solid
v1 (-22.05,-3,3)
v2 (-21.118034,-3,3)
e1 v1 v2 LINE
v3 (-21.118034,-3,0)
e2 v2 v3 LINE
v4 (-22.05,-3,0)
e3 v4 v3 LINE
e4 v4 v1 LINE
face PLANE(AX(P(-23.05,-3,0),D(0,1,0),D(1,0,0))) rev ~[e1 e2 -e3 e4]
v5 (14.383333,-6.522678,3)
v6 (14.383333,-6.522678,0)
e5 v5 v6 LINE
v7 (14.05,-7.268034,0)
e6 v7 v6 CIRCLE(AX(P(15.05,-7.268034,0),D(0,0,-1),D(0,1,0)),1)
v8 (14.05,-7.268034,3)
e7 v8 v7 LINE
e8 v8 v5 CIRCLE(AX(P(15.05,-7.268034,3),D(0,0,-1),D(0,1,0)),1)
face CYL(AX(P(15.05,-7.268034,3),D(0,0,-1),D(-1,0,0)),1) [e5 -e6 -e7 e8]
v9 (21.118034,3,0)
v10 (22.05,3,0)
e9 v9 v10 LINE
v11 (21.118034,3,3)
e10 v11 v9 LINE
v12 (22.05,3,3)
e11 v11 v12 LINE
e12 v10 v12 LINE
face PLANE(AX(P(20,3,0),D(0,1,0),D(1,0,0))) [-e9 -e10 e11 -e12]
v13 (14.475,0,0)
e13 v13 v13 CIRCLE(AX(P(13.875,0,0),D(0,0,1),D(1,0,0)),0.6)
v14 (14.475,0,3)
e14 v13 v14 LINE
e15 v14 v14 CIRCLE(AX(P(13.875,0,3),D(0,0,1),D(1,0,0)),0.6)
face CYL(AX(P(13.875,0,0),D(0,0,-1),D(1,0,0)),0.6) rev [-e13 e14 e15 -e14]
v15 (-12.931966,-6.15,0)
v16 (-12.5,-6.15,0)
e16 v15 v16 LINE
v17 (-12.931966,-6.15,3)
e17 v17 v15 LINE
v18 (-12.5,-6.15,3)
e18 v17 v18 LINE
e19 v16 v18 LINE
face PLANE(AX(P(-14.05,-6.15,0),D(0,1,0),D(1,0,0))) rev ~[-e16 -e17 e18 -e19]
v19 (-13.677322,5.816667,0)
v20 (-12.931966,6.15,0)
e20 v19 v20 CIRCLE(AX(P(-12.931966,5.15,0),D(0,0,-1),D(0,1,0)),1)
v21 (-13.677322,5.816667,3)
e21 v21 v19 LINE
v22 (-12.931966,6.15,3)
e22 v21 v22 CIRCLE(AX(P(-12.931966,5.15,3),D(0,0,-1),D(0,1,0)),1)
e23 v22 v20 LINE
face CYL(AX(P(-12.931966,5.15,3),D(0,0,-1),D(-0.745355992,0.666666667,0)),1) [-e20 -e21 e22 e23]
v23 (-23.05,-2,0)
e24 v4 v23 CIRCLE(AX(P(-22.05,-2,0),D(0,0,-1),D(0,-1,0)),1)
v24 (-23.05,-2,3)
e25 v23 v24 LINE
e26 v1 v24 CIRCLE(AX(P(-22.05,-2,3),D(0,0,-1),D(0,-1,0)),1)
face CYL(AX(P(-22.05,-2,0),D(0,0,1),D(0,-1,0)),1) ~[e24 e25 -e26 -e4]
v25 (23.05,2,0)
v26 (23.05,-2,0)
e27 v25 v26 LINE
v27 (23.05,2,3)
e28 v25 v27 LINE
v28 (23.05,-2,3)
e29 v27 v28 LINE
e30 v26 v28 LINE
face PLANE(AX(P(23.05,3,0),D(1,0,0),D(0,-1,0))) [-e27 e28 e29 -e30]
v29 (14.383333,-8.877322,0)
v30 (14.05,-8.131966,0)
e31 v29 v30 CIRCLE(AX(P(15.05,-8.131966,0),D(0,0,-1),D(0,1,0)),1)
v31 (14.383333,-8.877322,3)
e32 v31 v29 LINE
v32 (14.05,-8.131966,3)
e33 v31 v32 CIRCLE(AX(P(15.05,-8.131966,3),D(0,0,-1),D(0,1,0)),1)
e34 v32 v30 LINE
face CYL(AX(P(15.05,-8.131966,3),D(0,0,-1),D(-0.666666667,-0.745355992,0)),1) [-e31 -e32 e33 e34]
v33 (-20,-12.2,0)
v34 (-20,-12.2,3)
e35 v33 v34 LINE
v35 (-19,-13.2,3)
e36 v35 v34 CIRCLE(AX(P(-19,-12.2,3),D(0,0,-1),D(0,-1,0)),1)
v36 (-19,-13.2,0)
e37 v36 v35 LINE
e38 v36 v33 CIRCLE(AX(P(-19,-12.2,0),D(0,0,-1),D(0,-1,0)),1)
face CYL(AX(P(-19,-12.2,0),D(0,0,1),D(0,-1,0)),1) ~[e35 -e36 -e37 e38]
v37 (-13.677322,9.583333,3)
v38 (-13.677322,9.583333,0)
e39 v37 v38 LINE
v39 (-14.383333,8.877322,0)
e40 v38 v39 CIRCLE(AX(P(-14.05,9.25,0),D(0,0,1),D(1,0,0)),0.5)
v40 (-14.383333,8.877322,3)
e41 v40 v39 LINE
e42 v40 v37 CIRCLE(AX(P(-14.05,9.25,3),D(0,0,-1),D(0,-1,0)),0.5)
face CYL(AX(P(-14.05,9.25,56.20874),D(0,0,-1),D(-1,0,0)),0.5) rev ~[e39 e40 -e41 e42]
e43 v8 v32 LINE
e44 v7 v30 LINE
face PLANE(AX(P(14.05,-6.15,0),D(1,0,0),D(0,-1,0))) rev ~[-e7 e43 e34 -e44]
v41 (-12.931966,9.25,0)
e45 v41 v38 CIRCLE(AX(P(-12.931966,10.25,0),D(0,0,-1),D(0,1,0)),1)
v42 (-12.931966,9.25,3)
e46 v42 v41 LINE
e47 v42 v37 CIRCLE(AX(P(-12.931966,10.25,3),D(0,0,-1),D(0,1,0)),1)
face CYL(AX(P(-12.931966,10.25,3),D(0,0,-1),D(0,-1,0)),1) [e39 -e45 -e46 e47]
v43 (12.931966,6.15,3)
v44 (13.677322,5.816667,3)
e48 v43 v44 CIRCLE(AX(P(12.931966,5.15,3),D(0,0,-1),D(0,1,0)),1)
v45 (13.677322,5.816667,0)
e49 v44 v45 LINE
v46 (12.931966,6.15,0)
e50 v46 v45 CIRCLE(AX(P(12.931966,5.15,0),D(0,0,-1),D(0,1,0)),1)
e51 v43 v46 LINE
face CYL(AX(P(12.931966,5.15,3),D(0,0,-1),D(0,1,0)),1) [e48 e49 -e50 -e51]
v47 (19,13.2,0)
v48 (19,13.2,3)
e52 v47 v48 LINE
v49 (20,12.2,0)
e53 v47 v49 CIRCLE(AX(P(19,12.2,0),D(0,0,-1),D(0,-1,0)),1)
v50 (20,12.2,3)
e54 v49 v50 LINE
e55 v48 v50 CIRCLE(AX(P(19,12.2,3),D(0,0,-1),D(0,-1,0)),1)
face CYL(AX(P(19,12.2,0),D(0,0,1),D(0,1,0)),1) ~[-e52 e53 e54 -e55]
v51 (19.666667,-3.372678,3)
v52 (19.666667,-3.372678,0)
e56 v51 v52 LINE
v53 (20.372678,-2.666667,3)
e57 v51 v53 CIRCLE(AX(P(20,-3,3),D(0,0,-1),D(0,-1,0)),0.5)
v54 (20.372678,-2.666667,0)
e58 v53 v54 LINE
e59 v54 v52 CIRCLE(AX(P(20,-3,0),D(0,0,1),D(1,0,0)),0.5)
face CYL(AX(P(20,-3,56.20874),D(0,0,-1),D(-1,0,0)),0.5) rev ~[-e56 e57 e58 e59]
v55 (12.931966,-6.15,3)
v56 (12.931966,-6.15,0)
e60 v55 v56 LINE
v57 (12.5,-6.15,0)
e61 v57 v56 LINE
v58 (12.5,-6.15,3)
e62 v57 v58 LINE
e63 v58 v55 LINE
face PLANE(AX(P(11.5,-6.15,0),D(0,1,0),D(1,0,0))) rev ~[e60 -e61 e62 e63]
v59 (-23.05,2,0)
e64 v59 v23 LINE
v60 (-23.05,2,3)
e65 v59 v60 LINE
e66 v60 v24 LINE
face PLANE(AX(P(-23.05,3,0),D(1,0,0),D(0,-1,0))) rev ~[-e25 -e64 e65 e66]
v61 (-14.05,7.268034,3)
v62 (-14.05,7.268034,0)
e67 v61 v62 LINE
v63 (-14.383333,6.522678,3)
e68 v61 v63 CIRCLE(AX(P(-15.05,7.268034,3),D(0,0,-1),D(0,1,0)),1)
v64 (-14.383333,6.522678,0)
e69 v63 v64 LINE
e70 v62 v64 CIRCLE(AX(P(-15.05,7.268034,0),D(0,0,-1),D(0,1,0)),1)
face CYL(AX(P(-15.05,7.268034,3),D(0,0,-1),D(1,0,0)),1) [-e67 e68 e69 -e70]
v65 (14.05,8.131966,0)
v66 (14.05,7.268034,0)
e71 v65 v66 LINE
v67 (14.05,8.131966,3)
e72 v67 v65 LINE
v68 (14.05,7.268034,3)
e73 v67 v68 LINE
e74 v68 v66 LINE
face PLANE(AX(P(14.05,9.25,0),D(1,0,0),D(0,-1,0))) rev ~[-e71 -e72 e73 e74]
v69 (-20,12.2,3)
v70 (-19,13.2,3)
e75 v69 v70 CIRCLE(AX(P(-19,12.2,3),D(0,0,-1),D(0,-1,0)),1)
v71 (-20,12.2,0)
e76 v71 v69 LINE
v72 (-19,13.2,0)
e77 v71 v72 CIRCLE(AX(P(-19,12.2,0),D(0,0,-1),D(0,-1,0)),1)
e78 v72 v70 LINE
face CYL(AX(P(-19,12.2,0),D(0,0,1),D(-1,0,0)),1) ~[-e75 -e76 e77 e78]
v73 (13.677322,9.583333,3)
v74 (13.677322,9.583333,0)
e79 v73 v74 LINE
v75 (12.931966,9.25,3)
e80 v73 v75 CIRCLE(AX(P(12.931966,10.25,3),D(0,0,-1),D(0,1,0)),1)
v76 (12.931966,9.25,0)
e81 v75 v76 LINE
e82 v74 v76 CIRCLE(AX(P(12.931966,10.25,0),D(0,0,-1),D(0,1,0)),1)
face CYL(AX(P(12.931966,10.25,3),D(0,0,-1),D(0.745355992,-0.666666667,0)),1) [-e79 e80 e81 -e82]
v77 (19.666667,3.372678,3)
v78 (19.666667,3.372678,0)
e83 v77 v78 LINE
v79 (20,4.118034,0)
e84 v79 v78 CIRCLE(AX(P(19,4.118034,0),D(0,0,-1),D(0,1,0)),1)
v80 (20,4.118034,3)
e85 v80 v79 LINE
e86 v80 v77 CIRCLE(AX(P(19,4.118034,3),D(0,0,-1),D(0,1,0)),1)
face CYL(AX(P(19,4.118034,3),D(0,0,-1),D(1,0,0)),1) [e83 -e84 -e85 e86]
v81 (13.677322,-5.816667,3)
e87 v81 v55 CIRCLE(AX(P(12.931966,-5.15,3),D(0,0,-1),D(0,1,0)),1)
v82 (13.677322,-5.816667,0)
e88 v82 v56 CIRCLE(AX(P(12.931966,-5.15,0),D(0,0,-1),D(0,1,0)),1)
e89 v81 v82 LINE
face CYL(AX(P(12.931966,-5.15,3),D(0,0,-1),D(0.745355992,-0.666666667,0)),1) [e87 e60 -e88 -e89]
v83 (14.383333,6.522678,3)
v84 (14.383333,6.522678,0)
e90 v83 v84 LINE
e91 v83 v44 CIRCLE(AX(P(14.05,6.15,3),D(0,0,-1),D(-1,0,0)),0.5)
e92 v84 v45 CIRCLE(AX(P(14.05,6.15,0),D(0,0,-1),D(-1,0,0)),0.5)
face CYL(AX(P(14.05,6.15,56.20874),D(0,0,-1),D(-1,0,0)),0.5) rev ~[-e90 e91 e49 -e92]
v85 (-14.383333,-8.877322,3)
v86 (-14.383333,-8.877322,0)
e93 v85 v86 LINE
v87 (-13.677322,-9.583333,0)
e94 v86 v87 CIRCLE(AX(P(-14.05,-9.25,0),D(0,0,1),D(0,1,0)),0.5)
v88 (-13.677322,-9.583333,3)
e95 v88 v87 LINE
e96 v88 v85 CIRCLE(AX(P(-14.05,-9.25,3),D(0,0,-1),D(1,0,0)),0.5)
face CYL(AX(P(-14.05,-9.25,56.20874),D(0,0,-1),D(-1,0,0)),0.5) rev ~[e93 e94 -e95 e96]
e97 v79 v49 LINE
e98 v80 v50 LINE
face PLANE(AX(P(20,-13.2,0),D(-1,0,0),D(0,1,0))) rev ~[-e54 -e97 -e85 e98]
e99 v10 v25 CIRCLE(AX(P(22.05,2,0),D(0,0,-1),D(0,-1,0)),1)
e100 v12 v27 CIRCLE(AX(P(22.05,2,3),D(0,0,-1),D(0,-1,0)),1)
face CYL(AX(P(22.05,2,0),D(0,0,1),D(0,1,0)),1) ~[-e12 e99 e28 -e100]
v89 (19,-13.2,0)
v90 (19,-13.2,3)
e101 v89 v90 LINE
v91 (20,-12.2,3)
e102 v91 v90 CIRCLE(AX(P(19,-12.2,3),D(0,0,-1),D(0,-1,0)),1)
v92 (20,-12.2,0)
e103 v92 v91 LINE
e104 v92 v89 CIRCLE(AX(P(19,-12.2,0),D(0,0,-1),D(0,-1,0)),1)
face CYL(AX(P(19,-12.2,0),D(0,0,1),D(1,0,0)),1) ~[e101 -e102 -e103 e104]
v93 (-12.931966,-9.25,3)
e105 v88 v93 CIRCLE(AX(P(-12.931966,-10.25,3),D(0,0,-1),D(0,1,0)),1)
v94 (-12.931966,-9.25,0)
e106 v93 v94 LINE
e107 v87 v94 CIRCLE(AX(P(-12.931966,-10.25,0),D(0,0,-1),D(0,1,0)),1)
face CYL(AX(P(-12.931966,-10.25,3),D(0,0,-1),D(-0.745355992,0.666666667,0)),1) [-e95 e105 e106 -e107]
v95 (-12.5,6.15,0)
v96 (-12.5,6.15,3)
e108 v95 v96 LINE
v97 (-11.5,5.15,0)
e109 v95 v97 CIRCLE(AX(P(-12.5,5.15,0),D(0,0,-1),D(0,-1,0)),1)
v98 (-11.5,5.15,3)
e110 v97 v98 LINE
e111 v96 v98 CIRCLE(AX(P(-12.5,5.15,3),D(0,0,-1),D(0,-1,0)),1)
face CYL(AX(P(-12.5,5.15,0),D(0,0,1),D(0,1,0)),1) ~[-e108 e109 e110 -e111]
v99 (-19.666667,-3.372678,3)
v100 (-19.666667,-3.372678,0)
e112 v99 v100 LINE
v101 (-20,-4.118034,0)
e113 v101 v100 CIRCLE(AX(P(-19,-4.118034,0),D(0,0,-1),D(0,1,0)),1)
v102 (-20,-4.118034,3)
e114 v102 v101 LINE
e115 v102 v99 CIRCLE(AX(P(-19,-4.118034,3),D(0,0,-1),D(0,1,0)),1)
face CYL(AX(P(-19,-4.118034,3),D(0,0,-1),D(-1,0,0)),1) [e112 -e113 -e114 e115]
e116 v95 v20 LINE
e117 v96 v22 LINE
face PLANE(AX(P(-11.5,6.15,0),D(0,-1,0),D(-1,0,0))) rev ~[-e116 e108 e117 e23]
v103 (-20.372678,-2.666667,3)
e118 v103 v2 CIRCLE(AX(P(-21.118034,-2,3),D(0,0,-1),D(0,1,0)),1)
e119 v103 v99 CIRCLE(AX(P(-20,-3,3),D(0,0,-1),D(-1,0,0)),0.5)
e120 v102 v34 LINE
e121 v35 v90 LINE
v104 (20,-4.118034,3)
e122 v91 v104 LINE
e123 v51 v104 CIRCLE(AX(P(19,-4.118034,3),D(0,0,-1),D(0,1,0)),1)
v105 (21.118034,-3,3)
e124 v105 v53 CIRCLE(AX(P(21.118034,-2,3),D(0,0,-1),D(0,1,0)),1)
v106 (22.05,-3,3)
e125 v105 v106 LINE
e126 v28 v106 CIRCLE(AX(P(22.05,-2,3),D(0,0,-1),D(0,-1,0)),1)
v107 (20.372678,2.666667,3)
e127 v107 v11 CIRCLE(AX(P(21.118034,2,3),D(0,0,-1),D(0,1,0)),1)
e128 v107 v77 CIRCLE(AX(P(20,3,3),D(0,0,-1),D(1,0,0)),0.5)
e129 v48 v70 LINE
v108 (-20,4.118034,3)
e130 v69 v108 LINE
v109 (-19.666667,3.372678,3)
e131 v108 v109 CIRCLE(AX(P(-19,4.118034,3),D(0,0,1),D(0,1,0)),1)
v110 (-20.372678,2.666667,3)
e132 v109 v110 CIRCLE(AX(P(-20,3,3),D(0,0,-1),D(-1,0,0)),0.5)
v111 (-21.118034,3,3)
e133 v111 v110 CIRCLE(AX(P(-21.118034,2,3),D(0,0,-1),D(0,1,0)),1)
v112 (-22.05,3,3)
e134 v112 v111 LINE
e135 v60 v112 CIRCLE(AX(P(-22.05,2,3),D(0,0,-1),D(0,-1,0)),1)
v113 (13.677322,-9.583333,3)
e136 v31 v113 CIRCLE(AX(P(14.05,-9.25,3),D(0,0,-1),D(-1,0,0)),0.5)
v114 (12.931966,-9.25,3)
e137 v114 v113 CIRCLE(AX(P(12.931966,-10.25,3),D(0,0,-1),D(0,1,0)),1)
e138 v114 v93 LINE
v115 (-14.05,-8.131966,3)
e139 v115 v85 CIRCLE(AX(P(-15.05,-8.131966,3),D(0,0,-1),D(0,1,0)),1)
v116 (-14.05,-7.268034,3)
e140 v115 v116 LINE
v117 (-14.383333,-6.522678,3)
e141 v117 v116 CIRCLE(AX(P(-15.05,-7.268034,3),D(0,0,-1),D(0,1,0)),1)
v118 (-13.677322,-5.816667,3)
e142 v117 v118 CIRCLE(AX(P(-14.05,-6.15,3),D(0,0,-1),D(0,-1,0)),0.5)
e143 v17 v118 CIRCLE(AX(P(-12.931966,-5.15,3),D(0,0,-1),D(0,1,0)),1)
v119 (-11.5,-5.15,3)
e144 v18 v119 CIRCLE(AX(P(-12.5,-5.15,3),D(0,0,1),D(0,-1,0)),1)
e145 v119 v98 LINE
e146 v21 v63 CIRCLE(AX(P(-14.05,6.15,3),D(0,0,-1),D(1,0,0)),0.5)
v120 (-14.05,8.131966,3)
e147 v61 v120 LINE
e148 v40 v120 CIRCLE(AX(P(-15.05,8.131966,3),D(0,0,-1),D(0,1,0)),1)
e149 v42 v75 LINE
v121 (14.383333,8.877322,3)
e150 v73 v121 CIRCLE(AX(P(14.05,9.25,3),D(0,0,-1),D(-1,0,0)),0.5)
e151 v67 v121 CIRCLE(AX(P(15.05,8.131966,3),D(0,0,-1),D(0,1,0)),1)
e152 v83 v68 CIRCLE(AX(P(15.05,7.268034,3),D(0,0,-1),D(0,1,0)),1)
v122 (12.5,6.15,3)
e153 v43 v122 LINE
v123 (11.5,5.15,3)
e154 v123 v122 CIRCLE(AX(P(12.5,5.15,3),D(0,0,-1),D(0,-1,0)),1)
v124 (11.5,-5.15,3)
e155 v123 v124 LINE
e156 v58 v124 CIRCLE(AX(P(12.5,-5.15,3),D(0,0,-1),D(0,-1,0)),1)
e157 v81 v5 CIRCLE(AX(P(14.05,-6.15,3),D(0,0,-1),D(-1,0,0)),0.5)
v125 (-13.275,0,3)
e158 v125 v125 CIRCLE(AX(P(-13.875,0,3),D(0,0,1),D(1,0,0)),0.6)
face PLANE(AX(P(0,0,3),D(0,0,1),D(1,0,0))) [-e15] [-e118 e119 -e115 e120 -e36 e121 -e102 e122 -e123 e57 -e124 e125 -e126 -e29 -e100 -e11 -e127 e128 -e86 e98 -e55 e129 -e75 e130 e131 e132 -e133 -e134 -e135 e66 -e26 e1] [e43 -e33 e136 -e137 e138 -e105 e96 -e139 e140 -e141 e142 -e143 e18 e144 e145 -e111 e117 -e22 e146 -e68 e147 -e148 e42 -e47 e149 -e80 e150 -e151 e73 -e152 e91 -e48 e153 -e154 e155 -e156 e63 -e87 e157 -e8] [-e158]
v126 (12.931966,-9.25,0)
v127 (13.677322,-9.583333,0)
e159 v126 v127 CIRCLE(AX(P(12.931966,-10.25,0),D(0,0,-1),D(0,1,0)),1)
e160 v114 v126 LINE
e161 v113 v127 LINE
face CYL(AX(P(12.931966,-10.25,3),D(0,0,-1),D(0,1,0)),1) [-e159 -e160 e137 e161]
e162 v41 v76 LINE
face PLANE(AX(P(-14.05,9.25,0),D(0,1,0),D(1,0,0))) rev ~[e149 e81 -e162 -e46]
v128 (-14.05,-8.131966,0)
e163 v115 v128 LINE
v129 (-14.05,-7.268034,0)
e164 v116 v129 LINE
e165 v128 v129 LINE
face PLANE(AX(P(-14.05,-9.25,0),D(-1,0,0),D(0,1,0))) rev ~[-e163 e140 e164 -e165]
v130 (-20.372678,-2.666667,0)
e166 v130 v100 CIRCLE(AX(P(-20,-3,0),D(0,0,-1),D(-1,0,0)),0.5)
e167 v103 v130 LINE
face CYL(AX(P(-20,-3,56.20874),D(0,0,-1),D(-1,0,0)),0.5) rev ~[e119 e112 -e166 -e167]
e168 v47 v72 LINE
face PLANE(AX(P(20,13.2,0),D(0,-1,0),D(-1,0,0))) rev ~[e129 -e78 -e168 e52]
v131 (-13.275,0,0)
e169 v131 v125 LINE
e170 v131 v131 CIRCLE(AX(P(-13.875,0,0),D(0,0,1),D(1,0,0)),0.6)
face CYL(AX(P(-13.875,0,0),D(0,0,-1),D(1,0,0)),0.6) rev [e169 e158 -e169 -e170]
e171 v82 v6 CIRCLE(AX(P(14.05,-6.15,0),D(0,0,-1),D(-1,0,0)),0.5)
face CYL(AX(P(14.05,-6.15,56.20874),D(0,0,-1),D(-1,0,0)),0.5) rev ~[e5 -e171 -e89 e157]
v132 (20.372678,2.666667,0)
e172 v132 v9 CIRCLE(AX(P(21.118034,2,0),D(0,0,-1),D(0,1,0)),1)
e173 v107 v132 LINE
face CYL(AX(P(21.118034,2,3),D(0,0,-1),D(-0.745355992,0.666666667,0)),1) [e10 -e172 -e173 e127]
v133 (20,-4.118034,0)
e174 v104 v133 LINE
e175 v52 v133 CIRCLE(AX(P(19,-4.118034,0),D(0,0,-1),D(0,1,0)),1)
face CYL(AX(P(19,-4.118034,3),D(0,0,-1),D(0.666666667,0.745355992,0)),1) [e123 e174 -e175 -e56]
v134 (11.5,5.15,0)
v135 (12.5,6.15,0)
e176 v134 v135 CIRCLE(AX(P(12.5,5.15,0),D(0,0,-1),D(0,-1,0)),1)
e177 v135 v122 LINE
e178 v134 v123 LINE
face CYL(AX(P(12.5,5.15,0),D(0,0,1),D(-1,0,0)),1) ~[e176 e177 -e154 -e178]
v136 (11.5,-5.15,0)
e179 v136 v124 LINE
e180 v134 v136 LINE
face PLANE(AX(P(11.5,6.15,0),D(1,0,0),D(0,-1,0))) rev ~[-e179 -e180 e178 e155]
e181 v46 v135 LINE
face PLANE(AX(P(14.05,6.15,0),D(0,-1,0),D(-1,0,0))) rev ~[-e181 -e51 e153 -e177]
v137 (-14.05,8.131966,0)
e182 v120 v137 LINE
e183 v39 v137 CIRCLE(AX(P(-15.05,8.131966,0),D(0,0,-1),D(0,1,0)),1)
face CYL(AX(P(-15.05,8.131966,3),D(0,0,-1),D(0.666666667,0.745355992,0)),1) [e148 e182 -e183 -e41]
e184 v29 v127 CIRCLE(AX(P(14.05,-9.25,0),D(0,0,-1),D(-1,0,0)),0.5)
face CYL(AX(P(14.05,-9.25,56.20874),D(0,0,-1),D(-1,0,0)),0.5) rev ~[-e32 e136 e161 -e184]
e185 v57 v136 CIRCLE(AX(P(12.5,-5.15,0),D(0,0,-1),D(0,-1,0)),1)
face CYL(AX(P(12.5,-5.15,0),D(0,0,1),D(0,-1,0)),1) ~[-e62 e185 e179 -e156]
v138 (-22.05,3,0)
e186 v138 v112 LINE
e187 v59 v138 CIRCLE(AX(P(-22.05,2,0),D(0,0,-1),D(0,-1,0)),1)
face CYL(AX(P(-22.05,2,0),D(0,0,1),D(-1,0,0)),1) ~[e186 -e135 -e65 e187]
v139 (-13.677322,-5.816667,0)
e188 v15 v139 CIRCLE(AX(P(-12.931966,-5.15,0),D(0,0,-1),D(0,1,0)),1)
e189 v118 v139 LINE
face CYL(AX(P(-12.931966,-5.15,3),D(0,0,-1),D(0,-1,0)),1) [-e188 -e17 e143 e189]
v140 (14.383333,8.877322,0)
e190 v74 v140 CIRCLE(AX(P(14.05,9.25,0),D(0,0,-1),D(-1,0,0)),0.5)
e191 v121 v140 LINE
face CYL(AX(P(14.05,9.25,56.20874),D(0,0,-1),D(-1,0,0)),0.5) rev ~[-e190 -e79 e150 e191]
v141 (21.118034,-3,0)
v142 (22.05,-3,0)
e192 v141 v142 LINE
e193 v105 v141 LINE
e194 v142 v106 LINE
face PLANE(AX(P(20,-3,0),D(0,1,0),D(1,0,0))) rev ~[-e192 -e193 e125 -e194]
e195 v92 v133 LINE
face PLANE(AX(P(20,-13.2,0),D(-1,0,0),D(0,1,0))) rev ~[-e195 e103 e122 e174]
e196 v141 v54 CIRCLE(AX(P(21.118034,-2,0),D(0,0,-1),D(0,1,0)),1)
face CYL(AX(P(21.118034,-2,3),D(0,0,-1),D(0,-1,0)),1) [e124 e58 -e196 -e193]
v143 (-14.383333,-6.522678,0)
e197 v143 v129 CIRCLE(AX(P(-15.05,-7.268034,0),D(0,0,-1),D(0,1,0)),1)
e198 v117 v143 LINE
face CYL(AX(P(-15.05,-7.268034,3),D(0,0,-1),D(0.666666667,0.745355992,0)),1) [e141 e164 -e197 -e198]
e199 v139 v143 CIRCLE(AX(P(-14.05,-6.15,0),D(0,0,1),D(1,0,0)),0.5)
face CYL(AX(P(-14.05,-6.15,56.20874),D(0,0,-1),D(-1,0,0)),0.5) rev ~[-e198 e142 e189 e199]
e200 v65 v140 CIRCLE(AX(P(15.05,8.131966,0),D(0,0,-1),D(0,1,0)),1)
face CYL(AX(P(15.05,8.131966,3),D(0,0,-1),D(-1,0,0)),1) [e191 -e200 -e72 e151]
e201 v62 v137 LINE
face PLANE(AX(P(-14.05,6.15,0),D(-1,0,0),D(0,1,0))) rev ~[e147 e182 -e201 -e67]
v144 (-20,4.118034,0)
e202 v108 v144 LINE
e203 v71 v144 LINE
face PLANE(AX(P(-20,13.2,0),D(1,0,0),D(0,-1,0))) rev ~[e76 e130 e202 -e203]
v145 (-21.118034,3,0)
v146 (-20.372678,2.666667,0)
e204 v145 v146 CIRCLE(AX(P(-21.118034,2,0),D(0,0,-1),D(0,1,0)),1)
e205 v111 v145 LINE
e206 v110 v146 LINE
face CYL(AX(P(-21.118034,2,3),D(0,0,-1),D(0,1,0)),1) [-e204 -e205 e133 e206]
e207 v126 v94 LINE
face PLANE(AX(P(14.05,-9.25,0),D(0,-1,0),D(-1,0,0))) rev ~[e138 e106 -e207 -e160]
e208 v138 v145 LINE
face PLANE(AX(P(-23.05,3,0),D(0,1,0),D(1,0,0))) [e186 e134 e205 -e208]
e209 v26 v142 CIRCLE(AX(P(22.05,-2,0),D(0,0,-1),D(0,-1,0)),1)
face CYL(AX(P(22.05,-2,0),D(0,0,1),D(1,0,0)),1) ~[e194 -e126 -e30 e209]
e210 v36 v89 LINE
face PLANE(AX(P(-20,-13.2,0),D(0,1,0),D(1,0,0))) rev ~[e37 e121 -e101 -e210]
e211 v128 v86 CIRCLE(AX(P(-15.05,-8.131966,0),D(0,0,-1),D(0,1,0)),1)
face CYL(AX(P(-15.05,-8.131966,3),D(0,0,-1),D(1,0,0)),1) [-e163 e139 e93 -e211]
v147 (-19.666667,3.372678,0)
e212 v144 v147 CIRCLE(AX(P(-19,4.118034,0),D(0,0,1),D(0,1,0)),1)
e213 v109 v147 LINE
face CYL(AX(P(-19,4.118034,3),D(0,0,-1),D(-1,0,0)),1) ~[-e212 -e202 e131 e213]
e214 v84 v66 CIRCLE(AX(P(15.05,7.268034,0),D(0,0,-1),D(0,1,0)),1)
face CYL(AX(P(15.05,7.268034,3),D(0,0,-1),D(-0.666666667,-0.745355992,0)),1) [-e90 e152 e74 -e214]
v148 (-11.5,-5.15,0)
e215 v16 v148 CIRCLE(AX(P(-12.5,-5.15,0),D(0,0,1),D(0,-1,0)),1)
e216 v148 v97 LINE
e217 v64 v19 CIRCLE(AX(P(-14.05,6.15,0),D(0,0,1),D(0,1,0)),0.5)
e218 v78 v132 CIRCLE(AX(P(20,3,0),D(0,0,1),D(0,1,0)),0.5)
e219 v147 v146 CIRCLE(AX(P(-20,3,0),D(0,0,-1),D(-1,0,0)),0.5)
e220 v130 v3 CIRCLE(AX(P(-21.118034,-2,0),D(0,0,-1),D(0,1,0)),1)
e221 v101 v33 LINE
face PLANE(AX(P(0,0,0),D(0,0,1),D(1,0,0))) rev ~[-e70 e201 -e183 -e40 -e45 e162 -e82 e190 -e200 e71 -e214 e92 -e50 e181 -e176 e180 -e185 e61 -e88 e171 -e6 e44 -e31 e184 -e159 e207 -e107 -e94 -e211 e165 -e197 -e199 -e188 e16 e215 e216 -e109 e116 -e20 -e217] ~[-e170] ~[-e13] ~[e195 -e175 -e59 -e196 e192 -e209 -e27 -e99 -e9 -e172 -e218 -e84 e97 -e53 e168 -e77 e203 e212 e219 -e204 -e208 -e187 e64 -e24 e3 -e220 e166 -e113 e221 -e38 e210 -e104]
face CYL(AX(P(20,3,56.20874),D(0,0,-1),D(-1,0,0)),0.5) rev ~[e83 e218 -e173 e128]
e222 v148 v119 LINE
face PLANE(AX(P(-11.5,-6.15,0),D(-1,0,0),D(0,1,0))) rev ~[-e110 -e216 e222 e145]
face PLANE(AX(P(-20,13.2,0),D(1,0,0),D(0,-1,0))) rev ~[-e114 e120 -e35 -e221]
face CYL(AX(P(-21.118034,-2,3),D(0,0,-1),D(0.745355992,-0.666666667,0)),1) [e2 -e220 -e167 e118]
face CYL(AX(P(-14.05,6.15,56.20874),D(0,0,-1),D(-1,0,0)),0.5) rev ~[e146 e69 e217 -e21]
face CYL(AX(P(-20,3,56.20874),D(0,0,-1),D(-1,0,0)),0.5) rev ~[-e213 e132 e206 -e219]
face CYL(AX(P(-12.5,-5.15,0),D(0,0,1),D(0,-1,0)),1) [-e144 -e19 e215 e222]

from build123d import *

# Parameters (mm, degrees)
F0_R     = 0.6
F1_DEPTH = 3
F2_W     = 3.05
F2_H     = 6
F3_DEPTH = 3
F5_D     = 1
F6_R     = 1


with BuildPart() as f1:
    # F0 (on Top) → F1 (new body)
    with BuildSketch(Plane.XY):
        Polygon((-20, 13.2), (-20, -13.2), (0, -13.2), (20, -13.2), (20, 13.2), align=None)
        with Locations((-13.875, 0)):
            Circle(F0_R, mode=Mode.SUBTRACT)
        Polygon((-14.05, 6.15), (-14.05, 9.25), (14.05, 9.25), (14.05, 6.15), (11.5, 6.15), (11.5, -6.15), (14.05, -6.15), (14.05, -9.25), (-14.05, -9.25), (-14.05, -6.15), (-11.5, -6.15), (-11.5, 6.15), align=None, mode=Mode.SUBTRACT)
        with Locations((13.875, 0)):
            Circle(F0_R, mode=Mode.SUBTRACT)
    extrude(amount=F1_DEPTH)

    # F2 (on face) → F3 (join, through all)
    with BuildSketch(Plane(origin=(0, 0, 0), x_dir=(1, 0, 0), z_dir=(0, 0, -1))):
        with Locations((-21.525, 0)):
            Rectangle(F2_W, F2_H)
        with Locations((21.525, 0)):
            Rectangle(F2_W, F2_H)
    extrude(amount=-F3_DEPTH)

    # F5 (through all)
    with Locations(Plane.XY.offset(3)):
        with Locations((-14.05, 9.25), (-14.05, 6.15), (-20, 3), (-20, -3), (-14.05, -6.15), (-14.05, -9.25), (14.05, -6.15), (14.05, -9.25), (20, -3), (20, 3), (14.05, 6.15), (14.05, 9.25)):
            Hole(F5_D / 2)

    # F6
    f6_edges = [f1.edges().sort_by_distance(p)[0] for p in [
        (-20, 13.2, 1.5),
        (-23.05, 3, 1.5),
        (-23.05, -3, 1.5),
        (-20, -13.2, 1.5),
        (-11.5, 6.15, 1.5),
        (11.5, -6.15, 1.5),
        (11.5, 6.15, 1.5),
        (23.05, 3, 1.5),
        (20, 13.2, 1.5),
        (23.05, -3, 1.5),
        (20, -13.2, 1.5),
        (-11.5, -6.15, 1.5),
        (-20, 3.5, 1.5),
        (20, 3.5, 1.5),
        (20.5, 3, 1.5),
        (20.5, -3, 1.5),
        (20, -3.5, 1.5),
        (-20, -3.5, 1.5),
        (-20.5, -3, 1.5),
        (-20.5, 3, 1.5),
        (-13.55, 6.15, 1.5),
        (-13.55, -6.15, 1.5),
        (-14.05, -6.65, 1.5),
        (-14.05, -8.75, 1.5),
        (-13.55, -9.25, 1.5),
        (13.55, -9.25, 1.5),
        (14.05, -8.75, 1.5),
        (14.05, -6.65, 1.5),
        (13.55, -6.15, 1.5),
        (13.55, 6.15, 1.5),
        (14.05, 6.65, 1.5),
        (14.05, 8.75, 1.5),
        (13.55, 9.25, 1.5),
        (-13.55, 9.25, 1.5),
        (-14.05, 8.75, 1.5),
        (-14.05, 6.65, 1.5),
    ]]
    fillet(f6_edges, radius=F6_R)


solid = f1.part
